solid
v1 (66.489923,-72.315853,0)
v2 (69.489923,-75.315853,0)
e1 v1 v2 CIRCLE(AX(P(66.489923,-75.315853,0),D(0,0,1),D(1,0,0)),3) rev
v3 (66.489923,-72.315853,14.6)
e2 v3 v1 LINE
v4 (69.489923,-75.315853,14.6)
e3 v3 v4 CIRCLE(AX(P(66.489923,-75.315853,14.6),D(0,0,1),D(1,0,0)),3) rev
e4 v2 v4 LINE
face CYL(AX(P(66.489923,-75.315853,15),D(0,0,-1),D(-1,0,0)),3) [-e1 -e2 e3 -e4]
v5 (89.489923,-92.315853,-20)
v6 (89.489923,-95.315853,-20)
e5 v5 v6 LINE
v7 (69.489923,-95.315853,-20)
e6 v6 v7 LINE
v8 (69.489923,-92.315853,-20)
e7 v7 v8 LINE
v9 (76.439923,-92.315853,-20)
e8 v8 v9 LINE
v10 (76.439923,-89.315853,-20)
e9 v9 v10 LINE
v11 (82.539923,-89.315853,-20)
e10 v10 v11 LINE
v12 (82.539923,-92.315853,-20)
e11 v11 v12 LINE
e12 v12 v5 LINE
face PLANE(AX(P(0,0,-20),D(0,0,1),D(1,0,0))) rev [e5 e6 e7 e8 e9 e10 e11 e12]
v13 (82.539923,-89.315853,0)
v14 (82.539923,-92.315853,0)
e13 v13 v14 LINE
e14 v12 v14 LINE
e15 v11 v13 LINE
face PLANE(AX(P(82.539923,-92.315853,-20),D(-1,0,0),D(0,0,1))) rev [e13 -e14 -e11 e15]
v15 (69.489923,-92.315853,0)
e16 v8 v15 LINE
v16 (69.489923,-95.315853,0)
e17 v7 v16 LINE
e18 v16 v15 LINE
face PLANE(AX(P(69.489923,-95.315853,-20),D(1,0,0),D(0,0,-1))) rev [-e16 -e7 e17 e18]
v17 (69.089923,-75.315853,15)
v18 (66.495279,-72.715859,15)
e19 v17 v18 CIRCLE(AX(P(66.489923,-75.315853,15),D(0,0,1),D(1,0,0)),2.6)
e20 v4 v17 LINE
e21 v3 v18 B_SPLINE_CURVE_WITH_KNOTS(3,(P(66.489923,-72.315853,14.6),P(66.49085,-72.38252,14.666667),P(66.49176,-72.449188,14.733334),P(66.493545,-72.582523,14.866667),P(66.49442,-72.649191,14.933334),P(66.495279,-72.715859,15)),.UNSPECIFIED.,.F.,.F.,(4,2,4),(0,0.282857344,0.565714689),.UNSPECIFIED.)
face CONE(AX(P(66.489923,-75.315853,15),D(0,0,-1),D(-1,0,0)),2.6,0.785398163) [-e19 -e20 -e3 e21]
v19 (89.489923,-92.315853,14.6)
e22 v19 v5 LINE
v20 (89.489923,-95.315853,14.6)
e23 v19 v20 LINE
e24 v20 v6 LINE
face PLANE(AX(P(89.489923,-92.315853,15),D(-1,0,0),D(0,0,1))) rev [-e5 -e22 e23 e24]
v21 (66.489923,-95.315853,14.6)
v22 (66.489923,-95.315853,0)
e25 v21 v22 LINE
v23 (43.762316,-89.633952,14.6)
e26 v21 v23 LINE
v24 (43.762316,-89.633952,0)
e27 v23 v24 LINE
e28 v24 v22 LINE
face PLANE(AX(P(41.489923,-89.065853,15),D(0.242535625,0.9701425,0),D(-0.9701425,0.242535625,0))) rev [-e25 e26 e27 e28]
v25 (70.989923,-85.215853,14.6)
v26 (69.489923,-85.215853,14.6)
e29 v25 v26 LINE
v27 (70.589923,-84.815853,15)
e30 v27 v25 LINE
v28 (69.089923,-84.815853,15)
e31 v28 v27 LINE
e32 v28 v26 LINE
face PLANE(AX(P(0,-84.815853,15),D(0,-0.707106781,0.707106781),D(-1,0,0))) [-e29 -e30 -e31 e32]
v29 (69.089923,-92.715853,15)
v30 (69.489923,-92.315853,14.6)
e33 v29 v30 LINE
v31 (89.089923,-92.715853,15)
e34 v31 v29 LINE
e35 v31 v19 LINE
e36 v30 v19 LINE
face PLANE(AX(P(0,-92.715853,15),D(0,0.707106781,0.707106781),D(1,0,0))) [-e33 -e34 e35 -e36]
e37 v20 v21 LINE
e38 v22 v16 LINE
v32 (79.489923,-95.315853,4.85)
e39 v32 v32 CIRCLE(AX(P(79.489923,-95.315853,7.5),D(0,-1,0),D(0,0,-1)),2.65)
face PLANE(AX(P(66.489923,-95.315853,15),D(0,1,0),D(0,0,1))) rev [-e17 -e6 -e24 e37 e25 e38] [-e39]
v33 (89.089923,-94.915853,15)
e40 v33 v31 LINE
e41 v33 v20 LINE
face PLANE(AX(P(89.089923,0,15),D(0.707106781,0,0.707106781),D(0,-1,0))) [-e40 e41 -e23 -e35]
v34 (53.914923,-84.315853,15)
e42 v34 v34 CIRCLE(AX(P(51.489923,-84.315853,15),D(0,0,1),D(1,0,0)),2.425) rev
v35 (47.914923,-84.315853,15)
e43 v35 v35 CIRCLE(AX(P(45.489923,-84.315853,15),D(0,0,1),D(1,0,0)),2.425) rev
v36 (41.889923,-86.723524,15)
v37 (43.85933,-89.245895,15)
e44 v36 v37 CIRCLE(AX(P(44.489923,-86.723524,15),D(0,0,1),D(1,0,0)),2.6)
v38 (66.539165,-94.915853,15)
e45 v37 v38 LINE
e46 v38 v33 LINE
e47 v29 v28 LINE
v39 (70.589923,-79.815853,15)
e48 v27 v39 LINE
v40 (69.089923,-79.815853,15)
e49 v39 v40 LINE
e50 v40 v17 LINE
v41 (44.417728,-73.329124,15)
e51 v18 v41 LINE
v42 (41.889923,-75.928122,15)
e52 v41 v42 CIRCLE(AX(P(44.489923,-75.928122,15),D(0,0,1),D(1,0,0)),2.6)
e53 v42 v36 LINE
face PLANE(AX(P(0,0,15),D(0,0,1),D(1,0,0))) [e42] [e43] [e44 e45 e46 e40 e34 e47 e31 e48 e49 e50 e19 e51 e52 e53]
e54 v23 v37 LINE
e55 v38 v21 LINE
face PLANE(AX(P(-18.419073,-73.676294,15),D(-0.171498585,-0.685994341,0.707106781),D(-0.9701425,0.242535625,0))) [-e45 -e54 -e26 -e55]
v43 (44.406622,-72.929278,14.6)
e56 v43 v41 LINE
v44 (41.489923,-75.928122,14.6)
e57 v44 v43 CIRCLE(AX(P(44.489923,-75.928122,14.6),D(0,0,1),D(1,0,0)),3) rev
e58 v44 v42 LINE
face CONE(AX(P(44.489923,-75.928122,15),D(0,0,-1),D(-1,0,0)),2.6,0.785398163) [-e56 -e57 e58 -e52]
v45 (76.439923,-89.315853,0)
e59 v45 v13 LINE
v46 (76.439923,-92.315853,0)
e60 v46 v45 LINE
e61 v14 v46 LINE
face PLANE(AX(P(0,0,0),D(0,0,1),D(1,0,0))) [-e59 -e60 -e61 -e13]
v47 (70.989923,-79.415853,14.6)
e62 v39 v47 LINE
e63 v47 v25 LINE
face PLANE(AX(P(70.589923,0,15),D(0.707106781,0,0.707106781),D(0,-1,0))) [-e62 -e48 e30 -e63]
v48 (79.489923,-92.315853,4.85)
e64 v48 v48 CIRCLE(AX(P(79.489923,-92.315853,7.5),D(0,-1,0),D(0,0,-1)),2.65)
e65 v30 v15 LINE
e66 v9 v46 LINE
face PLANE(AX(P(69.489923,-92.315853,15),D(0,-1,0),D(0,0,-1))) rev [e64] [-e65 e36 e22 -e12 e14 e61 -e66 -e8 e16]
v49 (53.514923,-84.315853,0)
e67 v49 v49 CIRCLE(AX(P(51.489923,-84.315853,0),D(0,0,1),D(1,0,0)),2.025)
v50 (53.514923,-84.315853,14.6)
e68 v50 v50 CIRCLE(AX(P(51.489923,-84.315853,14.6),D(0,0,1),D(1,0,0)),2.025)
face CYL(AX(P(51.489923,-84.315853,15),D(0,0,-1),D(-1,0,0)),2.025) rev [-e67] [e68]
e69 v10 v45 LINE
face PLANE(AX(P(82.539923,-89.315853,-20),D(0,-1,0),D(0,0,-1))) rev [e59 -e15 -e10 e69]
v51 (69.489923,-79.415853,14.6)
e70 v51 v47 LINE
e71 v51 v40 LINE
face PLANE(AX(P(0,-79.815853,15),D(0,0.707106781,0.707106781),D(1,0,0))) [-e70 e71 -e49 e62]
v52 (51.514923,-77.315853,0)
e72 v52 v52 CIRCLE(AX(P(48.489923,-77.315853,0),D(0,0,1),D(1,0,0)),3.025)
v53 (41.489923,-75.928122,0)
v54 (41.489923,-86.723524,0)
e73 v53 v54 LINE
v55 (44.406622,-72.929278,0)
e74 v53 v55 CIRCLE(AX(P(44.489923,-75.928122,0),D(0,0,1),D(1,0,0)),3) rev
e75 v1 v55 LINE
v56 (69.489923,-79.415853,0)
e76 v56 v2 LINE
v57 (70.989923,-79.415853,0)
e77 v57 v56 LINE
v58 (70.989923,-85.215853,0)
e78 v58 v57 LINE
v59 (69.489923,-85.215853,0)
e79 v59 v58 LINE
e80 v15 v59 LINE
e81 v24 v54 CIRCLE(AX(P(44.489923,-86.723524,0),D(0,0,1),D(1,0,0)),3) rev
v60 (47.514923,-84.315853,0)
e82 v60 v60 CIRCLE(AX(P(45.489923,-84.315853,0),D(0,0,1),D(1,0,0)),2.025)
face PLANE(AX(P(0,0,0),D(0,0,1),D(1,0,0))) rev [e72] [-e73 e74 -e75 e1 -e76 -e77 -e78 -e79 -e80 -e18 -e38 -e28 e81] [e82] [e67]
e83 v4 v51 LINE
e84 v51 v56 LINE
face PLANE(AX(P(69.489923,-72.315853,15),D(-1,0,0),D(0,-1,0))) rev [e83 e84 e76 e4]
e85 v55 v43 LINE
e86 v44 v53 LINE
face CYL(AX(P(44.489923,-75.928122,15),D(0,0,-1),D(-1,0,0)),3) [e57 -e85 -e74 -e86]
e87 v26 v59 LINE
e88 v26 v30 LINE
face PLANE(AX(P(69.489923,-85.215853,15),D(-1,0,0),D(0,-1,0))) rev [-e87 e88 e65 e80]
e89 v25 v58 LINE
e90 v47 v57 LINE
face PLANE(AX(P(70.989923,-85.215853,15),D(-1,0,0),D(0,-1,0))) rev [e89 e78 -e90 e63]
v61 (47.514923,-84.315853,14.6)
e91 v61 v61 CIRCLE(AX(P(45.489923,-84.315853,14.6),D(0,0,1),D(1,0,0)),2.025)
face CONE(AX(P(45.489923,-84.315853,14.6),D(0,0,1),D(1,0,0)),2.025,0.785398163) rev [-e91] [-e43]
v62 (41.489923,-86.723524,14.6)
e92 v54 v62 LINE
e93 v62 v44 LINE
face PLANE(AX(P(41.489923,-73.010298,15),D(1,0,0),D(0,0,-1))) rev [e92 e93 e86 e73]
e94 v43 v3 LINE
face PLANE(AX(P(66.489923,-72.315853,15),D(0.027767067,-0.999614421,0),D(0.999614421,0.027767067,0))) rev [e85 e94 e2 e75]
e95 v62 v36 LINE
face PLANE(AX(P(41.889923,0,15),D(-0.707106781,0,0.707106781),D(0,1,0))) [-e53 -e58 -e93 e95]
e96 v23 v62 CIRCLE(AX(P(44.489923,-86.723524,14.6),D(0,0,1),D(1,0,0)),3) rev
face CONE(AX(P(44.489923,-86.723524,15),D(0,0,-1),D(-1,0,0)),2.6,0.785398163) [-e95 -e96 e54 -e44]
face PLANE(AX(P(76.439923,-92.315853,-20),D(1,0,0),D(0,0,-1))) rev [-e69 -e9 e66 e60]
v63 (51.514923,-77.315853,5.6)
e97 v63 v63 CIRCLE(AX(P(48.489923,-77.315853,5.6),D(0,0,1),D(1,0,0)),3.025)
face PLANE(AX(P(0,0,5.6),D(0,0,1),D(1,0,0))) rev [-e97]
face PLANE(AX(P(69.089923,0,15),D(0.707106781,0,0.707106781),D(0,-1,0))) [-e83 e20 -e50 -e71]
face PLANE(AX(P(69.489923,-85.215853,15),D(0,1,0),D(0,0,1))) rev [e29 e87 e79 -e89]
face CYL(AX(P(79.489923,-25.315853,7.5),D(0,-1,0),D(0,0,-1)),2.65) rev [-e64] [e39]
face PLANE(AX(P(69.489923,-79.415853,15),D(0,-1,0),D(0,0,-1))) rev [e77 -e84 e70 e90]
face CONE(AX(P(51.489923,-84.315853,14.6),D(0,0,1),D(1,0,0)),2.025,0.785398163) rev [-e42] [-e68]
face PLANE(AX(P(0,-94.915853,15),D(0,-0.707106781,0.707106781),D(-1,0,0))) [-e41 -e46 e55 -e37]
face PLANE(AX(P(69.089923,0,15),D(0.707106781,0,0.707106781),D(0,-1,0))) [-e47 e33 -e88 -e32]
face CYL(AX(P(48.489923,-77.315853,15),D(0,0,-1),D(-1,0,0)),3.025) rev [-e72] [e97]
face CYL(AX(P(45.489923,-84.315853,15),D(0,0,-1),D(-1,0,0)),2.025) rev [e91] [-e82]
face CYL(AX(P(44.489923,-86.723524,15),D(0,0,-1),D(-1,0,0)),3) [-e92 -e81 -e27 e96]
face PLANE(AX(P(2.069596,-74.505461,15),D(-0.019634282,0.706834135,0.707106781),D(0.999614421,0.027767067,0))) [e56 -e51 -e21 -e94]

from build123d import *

# Parameters (mm, degrees)
SKETCH1_R           = 3.025
SKETCH1_R_2         = 2.025
BOSS_EXTRUDE1_DEPTH = 15
BOSS_EXTRUDE2_START = 5.6
SKETCH1_2_R         = 3.025
BOSS_EXTRUDE2_DEPTH = 9.4
BOSS_EXTRUDE3_DEPTH = 20
SKETCH2_R           = 2.65
CUT_EXTRUDE1_DEPTH  = 70
FILLET1_R           = 3
CHAMFER1_SIZE       = 0.4


# Some blends are built 0.0001 mm under size
with BuildPart() as part:
    # Sketch1 → Boss-Extrude1 (new body)
    with BuildSketch(Plane.XY):
        Polygon((66.489922843, -72.31585339), (69.489922843, -72.31585339), (69.489922843, -79.41585339), (70.989922843, -79.41585339), (70.989922843, -85.21585339), (69.489922843, -85.21585339), (69.489922843, -92.31585339), (76.589922843, -92.31585339), (82.389922843, -92.31585339), (89.489922843, -92.31585339), (89.489922843, -95.31585339), (66.489922843, -95.31585339), (41.489922843, -89.06585339), (41.489922843, -73.010297834), align=None)
        with Locations((48.489922843, -77.31585339)):
            Circle(SKETCH1_R, mode=Mode.SUBTRACT)
        with Locations((45.489922843, -84.31585339)):
            Circle(SKETCH1_R_2, mode=Mode.SUBTRACT)
        with Locations((51.489922843, -84.31585339)):
            Circle(SKETCH1_R_2, mode=Mode.SUBTRACT)
    extrude(amount=BOSS_EXTRUDE1_DEPTH)

    # Sketch1<2> → Boss-Extrude2 (add)
    with BuildSketch(Plane.XY.offset(BOSS_EXTRUDE2_START)):
        with Locations((48.489922843, -77.31585339)):
            Circle(SKETCH1_2_R)
    extrude(amount=BOSS_EXTRUDE2_DEPTH)

    # Sketch3 → Boss-Extrude3 (add)
    with BuildSketch(Plane(origin=(0, 0, 0), x_dir=(-1, 0, 0), z_dir=(0, 0, -1))):
        Polygon((-76.439922843, -92.31585339), (-69.489922843, -92.31585339), (-69.489922843, -95.31585339), (-89.489922843, -95.31585339), (-89.489922843, -92.31585339), (-82.539922843, -92.31585339), (-82.539922843, -89.31585339), (-76.439922843, -89.31585339), align=None)
    extrude(amount=BOSS_EXTRUDE3_DEPTH)

    # Sketch2 → Cut-Extrude1 (cut)
    with BuildSketch(Plane.XZ.offset(95.31585339)):
        with Locations(Location((79.489922843, 7.5, 0), (0, 0, 270))):
            Circle(SKETCH2_R)
    extrude(amount=-CUT_EXTRUDE1_DEPTH, mode=Mode.SUBTRACT)

    # Fillet1
    fillet1_edges = [part.edges().sort_by_distance(p)[0] for p in [
        (69.489922843, -72.31585339, 7.5),
        (41.489922843, -73.010297834, 7.5),
        (41.489922843, -89.06585339, 7.5),
    ]]
    fillet(fillet1_edges, radius=FILLET1_R - 0.0001)  # a hair under: the kernel refuses the full size

    # Chamfer1
    # the kernel refuses this chamfer: 0.4 mm, written as the material it takes off along each edge
    with BuildSketch(Plane(origin=(90.518596038, -95.31585339, 15), x_dir=(0, 0.9996219169112966, 0.02749587661058671), z_dir=(-1, 0, 0))) as chamfer1_piece_1:
        Polygon((CHAMFER1_SIZE * 0.999621916911, CHAMFER1_SIZE * 0.0274958766106), (-CHAMFER1_SIZE * 0.0274958766106, CHAMFER1_SIZE * 0.999621916911), (0, 0), align=None)
    extrude(amount=25.05734639, mode=Mode.SUBTRACT)
    with BuildSketch(Plane(origin=(89.489922843, -91.287180195, 15), x_dir=(-0.9996219169112966, 0, 0.02749587661058671), z_dir=(0, -1, 0))) as chamfer1_piece_2:
        Polygon((CHAMFER1_SIZE * 0.999621916911, CHAMFER1_SIZE * 0.0274958766106), (-CHAMFER1_SIZE * 0.0274958766106, CHAMFER1_SIZE * 0.999621916911), (0, 0), align=None)
    extrude(amount=5.05734639, mode=Mode.SUBTRACT)
    with BuildSketch(Plane(origin=(69.489922843, -92.31585339, 15), x_dir=(0, -0.9996219169112966, 0.02749587661058671), z_dir=(1, 0, 0))) as chamfer1_piece_3:
        Polygon((CHAMFER1_SIZE * 0.999621916911, CHAMFER1_SIZE * 0.0274958766106), (-CHAMFER1_SIZE * 0.0274958766106, CHAMFER1_SIZE * 0.999621916911), (0, 0), align=None)
    extrude(amount=21.028673195, mode=Mode.SUBTRACT)
    with BuildSketch(Plane(origin=(69.489922843, -85.21585339, 15), x_dir=(-0.9996219169112966, -2.1408261351483406e-13, 0.02749587661058671), z_dir=(0, -1, 0))) as chamfer1_piece_4:
        Polygon((CHAMFER1_SIZE * 0.999621916911, CHAMFER1_SIZE * 0.0274958766106), (-CHAMFER1_SIZE * 0.0274958766106, CHAMFER1_SIZE * 0.999621916911), (0, 0), align=None)
    extrude(amount=7.1, mode=Mode.SUBTRACT)
    with BuildSketch(Plane(origin=(45.489922843, -84.31585339, 15), x_dir=(1, 0, 0), z_dir=(0, -1, 0))) as chamfer1_piece_5:
        Polygon((2.025 + CHAMFER1_SIZE, 0), (2.025, -CHAMFER1_SIZE), (2.025, 0), align=None)
    revolve(axis=Axis((45.489922843, -84.31585339, 15), (0, 0, 1)), mode=Mode.SUBTRACT)
    with BuildSketch(Plane(origin=(72.018596038, -85.21585339, 15), x_dir=(0, 0.9996219169112966, 0.02749587661058671), z_dir=(-1, 0, 0)), Plane(origin=(69.489922843, -79.41585339, 15), x_dir=(0, -0.9996219169112966, 0.02749587661058671), z_dir=(1, 0, 0))) as chamfer1_piece_6:
        Polygon((CHAMFER1_SIZE * 0.999621916911, CHAMFER1_SIZE * 0.0274958766106), (-CHAMFER1_SIZE * 0.0274958766106, CHAMFER1_SIZE * 0.999621916911), (0, 0), align=None)
    extrude(amount=2.528673195, mode=Mode.SUBTRACT)
    with BuildSketch(Plane(origin=(51.489922843, -84.31585339, 15), x_dir=(1, 0, 0), z_dir=(0, -1, 0))) as chamfer1_piece_7:
        Polygon((2.025 + CHAMFER1_SIZE, 0), (2.025, -CHAMFER1_SIZE), (2.025, 0), align=None)
    revolve(axis=Axis((51.489922843, -84.31585339, 15), (0, 0, 1)), mode=Mode.SUBTRACT)
    with BuildSketch(Plane(origin=(70.989922843, -78.387180195, 15), x_dir=(-0.9996219169112966, -2.6206664757850423e-13, 0.02749587661058671), z_dir=(0, -1, 0))) as chamfer1_piece_8:
        Polygon((CHAMFER1_SIZE * 0.999621916911, CHAMFER1_SIZE * 0.0274958766106), (-CHAMFER1_SIZE * 0.0274958766106, CHAMFER1_SIZE * 0.999621916911), (0, 0), align=None)
    extrude(amount=7.85734639, mode=Mode.SUBTRACT)
    with BuildSketch(Plane(origin=(44.406524418, -72.929281124, 15), x_dir=(-0.0007634798546782339, 0.027485274768416574, -0.9996219169112971), z_dir=(0.9996144206527183, 0.027767067240353136, 0))) as chamfer1_piece_9:
        Polygon((CHAMFER1_SIZE * 0.999621916911, -CHAMFER1_SIZE * 0.0274958766106), (-CHAMFER1_SIZE * 0.0274958766106, -CHAMFER1_SIZE * 0.999621916911), (0, 0), align=None)
    extrude(amount=23.120589807, mode=Mode.SUBTRACT)
    with BuildSketch(Plane(origin=(69.489922843, -75.31575339, 15), x_dir=(-0.9996219169112966, 2.140826135148345e-13, 0.02749587661058671), z_dir=(0, -1, 0))) as chamfer1_piece_10:
        Polygon((CHAMFER1_SIZE * 0.999621916911, CHAMFER1_SIZE * 0.0274958766106), (-CHAMFER1_SIZE * 0.0274958766106, CHAMFER1_SIZE * 0.999621916911), (0, 0), align=None)
    extrude(amount=4.1001, mode=Mode.SUBTRACT)
    with BuildSketch(Plane(origin=(41.489922843, -86.723602248, 15), x_dir=(0.9996219169112966, 0, 0.027495876610587656), z_dir=(0, 1, 0))) as chamfer1_piece_11:
        Polygon((CHAMFER1_SIZE * 0.999621916911, CHAMFER1_SIZE * 0.0274958766106), (-CHAMFER1_SIZE * 0.0274958766106, CHAMFER1_SIZE * 0.999621916911), (0, 0), align=None)
    extrude(amount=10.795577824, mode=Mode.SUBTRACT)
    with BuildSketch(Plane(origin=(67.487882428, -95.565343286, 15), x_dir=(0.24244392641809726, 0.9697757056723949, 0.027495876610587038), z_dir=(-0.9701425001453322, 0.2425356250363316, 0))) as chamfer1_piece_12:
        Polygon((CHAMFER1_SIZE * 0.999621916911, CHAMFER1_SIZE * 0.0274958766106), (-CHAMFER1_SIZE * 0.0274958766106, CHAMFER1_SIZE * 0.999621916911), (0, 0), align=None)
    extrude(amount=24.455832214, mode=Mode.SUBTRACT)
    with BuildSketch(Plane(origin=(44.489822843, -86.723602248, 15), x_dir=(-1, 0, 0), z_dir=(0, 1, 0))) as chamfer1_piece_13:
        Polygon((2.9999 - CHAMFER1_SIZE, 0), (2.9999, -CHAMFER1_SIZE), (2.9999, 0), align=None)
    revolve(axis=Axis((44.489822843, -86.723602248, 15), (0, 0, 1)), revolution_arc=75.963756532, mode=Mode.SUBTRACT)
    with BuildSketch(Plane(origin=(44.489822843, -75.928024424, 15), x_dir=(-0.02776706724035276, 0.9996144206527183, 0), z_dir=(0.9996144206527183, 0.02776706724035276, 0))) as chamfer1_piece_14:
        Polygon((2.9999 - CHAMFER1_SIZE, 0), (2.9999, -CHAMFER1_SIZE), (2.9999, 0), align=None)
    revolve(axis=Axis((44.489822843, -75.928024424, 15), (0, 0, 1)), revolution_arc=88.408859729, mode=Mode.SUBTRACT)
    with BuildSketch(Plane(origin=(66.490022843, -75.31575339, 15), x_dir=(0, 1, 0), z_dir=(-1, 0, 0))) as chamfer1_piece_15:
        Polygon((2.9999, CHAMFER1_SIZE), (2.9999 - CHAMFER1_SIZE, 0), (2.9999, 0), align=None)
    revolve(axis=Axis((66.490022843, -75.31575339, 15), (0, 0, -1)), revolution_arc=90, mode=Mode.SUBTRACT)
    with BuildSketch(Plane(origin=(65.461249648, -72.31585339, 15), x_dir=(0, 0.027495876610595927, -0.9996219169112964), z_dir=(1, 0, 0))) as chamfer1_piece_16:
        Polygon((CHAMFER1_SIZE * 0.999621916911, -CHAMFER1_SIZE * 0.0274958766106), (-CHAMFER1_SIZE * 0.0274958766106, -CHAMFER1_SIZE * 0.999621916911), (0, 0), align=None)
    extrude(amount=1.028773195, mode=Mode.SUBTRACT)
    with BuildSketch(Plane(origin=(69.489922843, -85.21585339, 15), x_dir=(-0.9996219169112966, -2.1408261351483406e-13, 0.02749587661058671), z_dir=(0, -1, 0))) as chamfer1_piece_17a_section:
        Polygon((CHAMFER1_SIZE * 0.999621916911, CHAMFER1_SIZE * 0.0274958766106), (-CHAMFER1_SIZE * 0.0274958766106, CHAMFER1_SIZE * 0.999621916911), (0, 0), align=None)
    chamfer1_piece_17a = extrude(amount=8.128673195, mode=Mode.PRIVATE)
    chamfer1_piece_17a = split(chamfer1_piece_17a, bisect_by=Plane(origin=(69.358005392, -92.31585339, 14.868082549), z_dir=(0, -1, 0)), keep=Keep.TOP, mode=Mode.PRIVATE)
    with BuildSketch(Plane(origin=(68.461249648, -92.31585339, 15), x_dir=(0, -0.9996219169112966, 0.02749587661058671), z_dir=(1, 0, 0))) as chamfer1_piece_17b_section:
        Polygon((CHAMFER1_SIZE * 0.999621916911, CHAMFER1_SIZE * 0.0274958766106), (-CHAMFER1_SIZE * 0.0274958766106, CHAMFER1_SIZE * 0.999621916911), (0, 0), align=None)
    chamfer1_piece_17b = extrude(amount=22.05734639, mode=Mode.PRIVATE)
    chamfer1_piece_17b = split(chamfer1_piece_17b, bisect_by=Plane(origin=(69.489922843, -92.44777084, 14.868082549), z_dir=(-1, 0, 0)), keep=Keep.TOP, mode=Mode.PRIVATE)
    chamfer1_piece_17 = chamfer1_piece_17a & chamfer1_piece_17b
    add(chamfer1_piece_17, mode=Mode.SUBTRACT)
    with BuildSketch(Plane(origin=(72.018596038, -85.21585339, 15), x_dir=(0, 0.9996219169112966, 0.02749587661058671), z_dir=(-1, 0, 0))) as chamfer1_piece_18a_section:
        Polygon((CHAMFER1_SIZE * 0.999621916911, CHAMFER1_SIZE * 0.0274958766106), (-CHAMFER1_SIZE * 0.0274958766106, CHAMFER1_SIZE * 0.999621916911), (0, 0), align=None)
    chamfer1_piece_18a = extrude(amount=3.55734639, mode=Mode.PRIVATE)
    chamfer1_piece_18a = split(chamfer1_piece_18a, bisect_by=Plane(origin=(69.489922843, -85.083935939, 14.868082549), z_dir=(-1, 0, 0)), keep=Keep.TOP, mode=Mode.PRIVATE)
    with BuildSketch(Plane(origin=(69.489922843, -84.187180195, 15), x_dir=(-0.9996219169112966, -2.1408261351483406e-13, 0.02749587661058671), z_dir=(0, -1, 0))) as chamfer1_piece_18b_section:
        Polygon((CHAMFER1_SIZE * 0.999621916911, CHAMFER1_SIZE * 0.0274958766106), (-CHAMFER1_SIZE * 0.0274958766106, CHAMFER1_SIZE * 0.999621916911), (0, 0), align=None)
    chamfer1_piece_18b = extrude(amount=8.128673195, mode=Mode.PRIVATE)
    chamfer1_piece_18b = split(chamfer1_piece_18b, bisect_by=Plane(origin=(69.358005392, -85.21585339, 14.868082549), z_dir=(0, 1, 0)), keep=Keep.TOP, mode=Mode.PRIVATE)
    chamfer1_piece_18 = chamfer1_piece_18a & chamfer1_piece_18b
    add(chamfer1_piece_18, mode=Mode.SUBTRACT)
    with BuildSketch(Plane(origin=(69.489922843, -75.31575339, 15), x_dir=(-0.9996219169112966, 2.140826135148345e-13, 0.02749587661058671), z_dir=(0, -1, 0))) as chamfer1_piece_19a_section:
        Polygon((CHAMFER1_SIZE * 0.999621916911, CHAMFER1_SIZE * 0.0274958766106), (-CHAMFER1_SIZE * 0.0274958766106, CHAMFER1_SIZE * 0.999621916911), (0, 0), align=None)
    chamfer1_piece_19a = extrude(amount=5.128773195, mode=Mode.PRIVATE)
    chamfer1_piece_19a = split(chamfer1_piece_19a, bisect_by=Plane(origin=(69.358005392, -79.41585339, 14.868082549), z_dir=(0, -1, 0)), keep=Keep.TOP, mode=Mode.PRIVATE)
    with BuildSketch(Plane(origin=(68.461249648, -79.41585339, 15), x_dir=(0, -0.9996219169112966, 0.02749587661058671), z_dir=(1, 0, 0))) as chamfer1_piece_19b_section:
        Polygon((CHAMFER1_SIZE * 0.999621916911, CHAMFER1_SIZE * 0.0274958766106), (-CHAMFER1_SIZE * 0.0274958766106, CHAMFER1_SIZE * 0.999621916911), (0, 0), align=None)
    chamfer1_piece_19b = extrude(amount=3.55734639, mode=Mode.PRIVATE)
    chamfer1_piece_19b = split(chamfer1_piece_19b, bisect_by=Plane(origin=(69.489922843, -79.54777084, 14.868082549), z_dir=(-1, 0, 0)), keep=Keep.TOP, mode=Mode.PRIVATE)
    chamfer1_piece_19 = chamfer1_piece_19a & chamfer1_piece_19b
    add(chamfer1_piece_19, mode=Mode.SUBTRACT)


solid = part.part
